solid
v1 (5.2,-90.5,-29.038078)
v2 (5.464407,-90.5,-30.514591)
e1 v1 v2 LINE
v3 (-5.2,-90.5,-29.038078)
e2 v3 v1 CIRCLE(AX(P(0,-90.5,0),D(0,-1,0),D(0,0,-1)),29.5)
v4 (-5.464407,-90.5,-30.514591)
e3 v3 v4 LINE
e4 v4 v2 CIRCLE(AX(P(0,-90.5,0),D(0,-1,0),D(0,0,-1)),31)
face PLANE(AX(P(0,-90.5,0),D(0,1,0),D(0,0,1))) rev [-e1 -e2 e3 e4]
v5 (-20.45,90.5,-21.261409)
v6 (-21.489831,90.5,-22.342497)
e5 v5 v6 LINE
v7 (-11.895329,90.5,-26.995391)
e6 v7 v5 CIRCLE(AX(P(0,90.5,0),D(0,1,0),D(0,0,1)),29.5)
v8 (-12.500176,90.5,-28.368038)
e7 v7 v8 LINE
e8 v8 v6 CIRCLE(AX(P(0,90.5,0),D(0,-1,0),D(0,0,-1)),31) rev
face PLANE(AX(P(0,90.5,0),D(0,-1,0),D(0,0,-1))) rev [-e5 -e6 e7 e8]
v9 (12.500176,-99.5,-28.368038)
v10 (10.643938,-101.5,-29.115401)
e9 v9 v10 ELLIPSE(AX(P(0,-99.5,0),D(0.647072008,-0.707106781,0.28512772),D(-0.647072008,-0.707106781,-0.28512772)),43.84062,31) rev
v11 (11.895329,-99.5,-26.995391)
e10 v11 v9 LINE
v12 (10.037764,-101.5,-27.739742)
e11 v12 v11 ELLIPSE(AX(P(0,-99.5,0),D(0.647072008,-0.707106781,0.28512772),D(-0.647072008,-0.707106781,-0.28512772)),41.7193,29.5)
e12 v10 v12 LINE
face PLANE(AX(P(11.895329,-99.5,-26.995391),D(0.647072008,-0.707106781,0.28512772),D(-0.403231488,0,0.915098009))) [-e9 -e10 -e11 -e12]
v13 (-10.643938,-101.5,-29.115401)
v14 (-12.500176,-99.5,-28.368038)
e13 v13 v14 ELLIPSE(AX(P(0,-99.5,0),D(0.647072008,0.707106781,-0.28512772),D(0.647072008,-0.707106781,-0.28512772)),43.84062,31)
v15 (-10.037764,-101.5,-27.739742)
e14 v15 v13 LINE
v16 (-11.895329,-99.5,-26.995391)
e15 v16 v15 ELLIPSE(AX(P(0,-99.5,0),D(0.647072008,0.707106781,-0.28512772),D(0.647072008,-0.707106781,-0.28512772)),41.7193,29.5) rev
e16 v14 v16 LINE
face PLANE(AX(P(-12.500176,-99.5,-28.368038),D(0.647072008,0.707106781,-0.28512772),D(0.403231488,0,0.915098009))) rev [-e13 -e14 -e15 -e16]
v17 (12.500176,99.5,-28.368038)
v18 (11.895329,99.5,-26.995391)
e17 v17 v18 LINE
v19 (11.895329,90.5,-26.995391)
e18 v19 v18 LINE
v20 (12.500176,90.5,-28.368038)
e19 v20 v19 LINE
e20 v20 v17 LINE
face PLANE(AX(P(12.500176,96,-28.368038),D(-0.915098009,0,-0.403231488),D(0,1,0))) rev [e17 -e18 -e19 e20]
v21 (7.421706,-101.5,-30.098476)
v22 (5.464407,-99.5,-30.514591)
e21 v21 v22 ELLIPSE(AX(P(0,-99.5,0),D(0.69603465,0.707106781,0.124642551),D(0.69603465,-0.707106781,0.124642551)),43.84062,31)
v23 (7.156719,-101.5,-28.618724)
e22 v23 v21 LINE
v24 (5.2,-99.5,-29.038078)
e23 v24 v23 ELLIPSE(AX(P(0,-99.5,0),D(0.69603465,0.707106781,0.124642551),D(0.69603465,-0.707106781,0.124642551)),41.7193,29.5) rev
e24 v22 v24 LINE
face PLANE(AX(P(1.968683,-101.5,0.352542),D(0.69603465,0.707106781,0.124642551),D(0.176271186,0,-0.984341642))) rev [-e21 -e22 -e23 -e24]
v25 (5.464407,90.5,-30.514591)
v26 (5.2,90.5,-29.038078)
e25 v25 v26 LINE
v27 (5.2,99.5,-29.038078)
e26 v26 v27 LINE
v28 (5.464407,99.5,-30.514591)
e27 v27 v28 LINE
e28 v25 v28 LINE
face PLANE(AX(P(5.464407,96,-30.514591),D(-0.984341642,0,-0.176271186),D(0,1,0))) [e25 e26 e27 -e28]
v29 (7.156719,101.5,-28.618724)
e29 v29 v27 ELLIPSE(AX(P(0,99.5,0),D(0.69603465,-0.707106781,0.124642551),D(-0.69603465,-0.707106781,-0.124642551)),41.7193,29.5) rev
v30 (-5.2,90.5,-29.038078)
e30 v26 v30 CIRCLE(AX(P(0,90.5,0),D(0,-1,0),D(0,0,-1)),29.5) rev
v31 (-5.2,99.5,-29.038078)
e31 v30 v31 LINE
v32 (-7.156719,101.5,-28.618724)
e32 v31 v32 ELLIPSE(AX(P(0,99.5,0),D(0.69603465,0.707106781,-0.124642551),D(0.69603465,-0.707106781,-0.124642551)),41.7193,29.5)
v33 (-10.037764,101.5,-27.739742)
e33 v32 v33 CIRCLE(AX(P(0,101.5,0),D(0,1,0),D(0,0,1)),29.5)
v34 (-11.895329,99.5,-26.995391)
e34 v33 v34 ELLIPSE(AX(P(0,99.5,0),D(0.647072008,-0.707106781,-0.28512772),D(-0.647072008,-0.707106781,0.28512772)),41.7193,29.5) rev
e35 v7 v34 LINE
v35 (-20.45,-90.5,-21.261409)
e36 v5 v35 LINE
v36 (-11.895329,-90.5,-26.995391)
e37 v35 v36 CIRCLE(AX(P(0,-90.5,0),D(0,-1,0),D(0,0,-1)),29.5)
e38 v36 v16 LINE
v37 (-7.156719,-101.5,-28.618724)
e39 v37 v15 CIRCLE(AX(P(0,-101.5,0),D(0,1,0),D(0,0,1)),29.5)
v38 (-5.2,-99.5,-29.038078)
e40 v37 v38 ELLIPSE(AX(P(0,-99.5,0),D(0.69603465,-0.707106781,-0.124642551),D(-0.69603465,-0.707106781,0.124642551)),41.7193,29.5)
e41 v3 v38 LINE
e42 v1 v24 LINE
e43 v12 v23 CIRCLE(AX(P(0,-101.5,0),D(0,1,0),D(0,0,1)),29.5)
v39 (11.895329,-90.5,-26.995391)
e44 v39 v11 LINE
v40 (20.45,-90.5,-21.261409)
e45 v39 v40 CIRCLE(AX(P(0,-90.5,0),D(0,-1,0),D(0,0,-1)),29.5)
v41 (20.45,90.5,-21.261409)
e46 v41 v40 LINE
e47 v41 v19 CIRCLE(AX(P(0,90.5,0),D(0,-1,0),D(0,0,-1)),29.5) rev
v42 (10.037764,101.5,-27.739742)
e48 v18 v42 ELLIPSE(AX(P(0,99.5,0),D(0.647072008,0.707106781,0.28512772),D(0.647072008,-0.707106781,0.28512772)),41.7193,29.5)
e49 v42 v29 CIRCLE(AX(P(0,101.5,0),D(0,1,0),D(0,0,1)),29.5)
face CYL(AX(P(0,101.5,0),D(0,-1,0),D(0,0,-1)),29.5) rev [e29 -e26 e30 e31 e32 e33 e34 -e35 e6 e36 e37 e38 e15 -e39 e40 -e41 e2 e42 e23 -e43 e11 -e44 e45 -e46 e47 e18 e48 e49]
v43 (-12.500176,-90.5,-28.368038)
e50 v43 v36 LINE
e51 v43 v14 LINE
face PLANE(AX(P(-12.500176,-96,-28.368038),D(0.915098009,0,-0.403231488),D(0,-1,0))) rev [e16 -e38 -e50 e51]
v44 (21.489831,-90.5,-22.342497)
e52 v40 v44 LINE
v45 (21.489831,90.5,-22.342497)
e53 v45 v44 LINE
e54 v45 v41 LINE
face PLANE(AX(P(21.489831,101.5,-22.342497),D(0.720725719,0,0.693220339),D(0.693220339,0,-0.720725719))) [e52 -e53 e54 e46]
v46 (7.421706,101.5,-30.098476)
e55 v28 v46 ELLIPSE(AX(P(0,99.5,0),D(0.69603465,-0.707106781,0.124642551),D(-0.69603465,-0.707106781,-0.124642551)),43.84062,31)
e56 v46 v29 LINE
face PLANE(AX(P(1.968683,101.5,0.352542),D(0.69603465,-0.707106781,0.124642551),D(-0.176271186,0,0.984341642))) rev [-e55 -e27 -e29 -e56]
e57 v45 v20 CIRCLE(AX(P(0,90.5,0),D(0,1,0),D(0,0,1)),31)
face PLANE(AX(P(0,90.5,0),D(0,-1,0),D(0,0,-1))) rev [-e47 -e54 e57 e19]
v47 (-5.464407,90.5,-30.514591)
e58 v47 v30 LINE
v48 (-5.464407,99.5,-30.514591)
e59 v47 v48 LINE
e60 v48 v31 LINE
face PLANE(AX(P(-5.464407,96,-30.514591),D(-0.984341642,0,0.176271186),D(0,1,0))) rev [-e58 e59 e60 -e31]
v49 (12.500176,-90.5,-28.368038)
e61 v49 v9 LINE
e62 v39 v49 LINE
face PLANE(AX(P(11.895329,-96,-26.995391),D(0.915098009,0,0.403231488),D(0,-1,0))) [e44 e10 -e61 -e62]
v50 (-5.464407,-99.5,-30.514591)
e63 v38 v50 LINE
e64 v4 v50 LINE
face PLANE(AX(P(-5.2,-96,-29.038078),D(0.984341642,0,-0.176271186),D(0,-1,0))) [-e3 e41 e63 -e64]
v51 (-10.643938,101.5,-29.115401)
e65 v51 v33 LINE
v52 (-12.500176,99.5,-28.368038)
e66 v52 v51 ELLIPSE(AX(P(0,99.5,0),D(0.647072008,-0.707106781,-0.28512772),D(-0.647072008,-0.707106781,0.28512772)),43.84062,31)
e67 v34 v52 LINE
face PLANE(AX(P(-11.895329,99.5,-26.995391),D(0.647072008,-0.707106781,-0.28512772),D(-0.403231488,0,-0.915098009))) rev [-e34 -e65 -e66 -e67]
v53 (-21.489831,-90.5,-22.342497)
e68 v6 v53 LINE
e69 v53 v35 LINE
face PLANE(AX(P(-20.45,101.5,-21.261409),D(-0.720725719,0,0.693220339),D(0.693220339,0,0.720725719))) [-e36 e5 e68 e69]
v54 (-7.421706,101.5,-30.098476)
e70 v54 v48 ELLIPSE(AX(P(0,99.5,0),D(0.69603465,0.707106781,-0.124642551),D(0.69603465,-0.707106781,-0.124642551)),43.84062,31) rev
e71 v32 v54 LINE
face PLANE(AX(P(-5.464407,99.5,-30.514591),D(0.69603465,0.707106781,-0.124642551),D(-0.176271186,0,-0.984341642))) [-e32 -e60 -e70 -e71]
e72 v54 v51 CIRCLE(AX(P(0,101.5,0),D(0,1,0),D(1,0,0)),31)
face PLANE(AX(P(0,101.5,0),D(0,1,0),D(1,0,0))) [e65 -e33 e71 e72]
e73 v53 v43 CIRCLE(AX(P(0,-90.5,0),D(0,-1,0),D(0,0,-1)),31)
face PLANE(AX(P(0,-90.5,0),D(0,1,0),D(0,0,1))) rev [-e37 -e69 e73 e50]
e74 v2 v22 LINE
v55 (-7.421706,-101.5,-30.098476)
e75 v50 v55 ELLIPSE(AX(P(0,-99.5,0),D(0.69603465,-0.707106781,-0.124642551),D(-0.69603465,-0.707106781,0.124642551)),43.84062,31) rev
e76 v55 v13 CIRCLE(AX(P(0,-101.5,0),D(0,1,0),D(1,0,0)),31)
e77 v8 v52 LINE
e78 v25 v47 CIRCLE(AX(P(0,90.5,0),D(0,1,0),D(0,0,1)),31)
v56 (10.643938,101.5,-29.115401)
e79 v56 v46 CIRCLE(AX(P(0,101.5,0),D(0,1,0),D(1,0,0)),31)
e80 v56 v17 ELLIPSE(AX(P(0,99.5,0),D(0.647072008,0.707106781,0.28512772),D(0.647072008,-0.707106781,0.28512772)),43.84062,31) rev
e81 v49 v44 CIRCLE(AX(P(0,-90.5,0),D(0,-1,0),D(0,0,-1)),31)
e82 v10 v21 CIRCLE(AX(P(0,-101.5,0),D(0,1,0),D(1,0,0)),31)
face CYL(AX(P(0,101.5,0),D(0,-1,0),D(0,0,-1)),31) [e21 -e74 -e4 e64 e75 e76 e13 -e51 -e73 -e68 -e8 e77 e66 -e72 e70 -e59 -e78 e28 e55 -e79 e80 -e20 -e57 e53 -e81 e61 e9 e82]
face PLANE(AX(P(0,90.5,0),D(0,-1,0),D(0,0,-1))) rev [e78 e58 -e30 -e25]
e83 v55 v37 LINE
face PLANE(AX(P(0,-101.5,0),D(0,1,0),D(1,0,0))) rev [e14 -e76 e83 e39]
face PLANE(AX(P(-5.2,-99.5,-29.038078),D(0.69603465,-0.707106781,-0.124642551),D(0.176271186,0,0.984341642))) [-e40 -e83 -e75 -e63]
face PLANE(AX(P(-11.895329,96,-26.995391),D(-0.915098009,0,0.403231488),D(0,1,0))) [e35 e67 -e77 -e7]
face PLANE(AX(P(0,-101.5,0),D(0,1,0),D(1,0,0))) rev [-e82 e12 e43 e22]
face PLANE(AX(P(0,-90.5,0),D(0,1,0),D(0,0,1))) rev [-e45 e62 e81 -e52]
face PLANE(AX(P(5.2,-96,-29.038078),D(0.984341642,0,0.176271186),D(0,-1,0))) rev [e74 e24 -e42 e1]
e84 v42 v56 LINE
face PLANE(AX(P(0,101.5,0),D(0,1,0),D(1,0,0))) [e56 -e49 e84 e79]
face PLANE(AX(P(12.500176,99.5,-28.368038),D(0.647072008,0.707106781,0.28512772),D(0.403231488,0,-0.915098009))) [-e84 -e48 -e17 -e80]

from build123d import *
from build123d.topology import SkipClean

# Parameters (mm, degrees)
BASE_FLANGE1_DEPTH = 101.5
SKETCH6_OUTSIDE_W  = 86.526
SKETCH6_OUTSIDE_H  = 53.285
EXTRUDE1_DEPTH     = 11
CHAMFER1_SIZE      = 2


# Sheet-metal steps are written as plain solids
with BuildPart() as part:
    # Sketch1 → Base-Flange1 (new, symmetric)
    with BuildSketch(Plane(origin=(0, 0, 0), x_dir=(1, 0, 0), z_dir=(0, 1, 0))):
        with BuildLine():
            ThreePointArc((20.45, 21.261409), (0, 29.5), (-20.45, 21.261409))
            Line((-20.45, 21.261409), (-21.489831, 22.342497))
            ThreePointArc((-21.489831, 22.342497), (0, 31), (21.489831, 22.342497))
            Line((21.489831, 22.342497), (20.45, 21.261409))
        make_face()
    extrude(amount=BASE_FLANGE1_DEPTH, both=True)

    # Sketch6 outside → Extrude1 (cut)
    with SkipClean():  # the faces are left unmerged after this step: merging them gives an invalid solid
        with BuildSketch(Plane(origin=(0, 101.5, 0), x_dir=(1, 0, 0), z_dir=(0, 1, 0))):
            with Locations((0, 26.1305)):
                Rectangle(SKETCH6_OUTSIDE_W, SKETCH6_OUTSIDE_H)
            with BuildLine():
                Line((-12.500176, 28.368038), (-11.895329, 26.995391))
                ThreePointArc((-11.895329, 26.995391), (-8.608467, 28.216029), (-5.2, 29.038078))
                Line((-5.2, 29.038078), (-5.464407, 30.514591))
                ThreePointArc((-5.464407, 30.514591), (-9.046186, 29.650742), (-12.500176, 28.368038))
            make_face(mode=Mode.SUBTRACT)
            with BuildLine():
                Line((5.464407, 30.514591), (5.2, 29.038078))
                ThreePointArc((5.2, 29.038078), (8.608467, 28.216029), (11.895329, 26.995391))
                Line((11.895329, 26.995391), (12.500176, 28.368038))
                ThreePointArc((12.500176, 28.368038), (9.046186, 29.650742), (5.464407, 30.514591))
            make_face(mode=Mode.SUBTRACT)
        extrude1 = extrude(amount=-EXTRUDE1_DEPTH, mode=Mode.SUBTRACT)

    # Mirror1: Extrude1 across plane
    with SkipClean():  # the faces are left unmerged after this step: merging them gives an invalid solid
        add(extrude1.mirror(Plane.ZX), mode=Mode.SUBTRACT)

    # Chamfer1
    chamfer1_edges = [part.edges().sort_by_distance(p)[0] for p in [
        (12.197753, 101.5, -27.681715),
        (-12.197753, 101.5, -27.681715),
        (-5.332203, 101.5, -29.776335),
        (5.332203, 101.5, -29.776335),
        (-5.332203, -101.5, -29.776335),
        (5.332203, -101.5, -29.776335),
        (-12.197753, -101.5, -27.681715),
        (12.197753, -101.5, -27.681715),
    ]]
    chamfer(chamfer1_edges, length=CHAMFER1_SIZE)


solid = part.part
